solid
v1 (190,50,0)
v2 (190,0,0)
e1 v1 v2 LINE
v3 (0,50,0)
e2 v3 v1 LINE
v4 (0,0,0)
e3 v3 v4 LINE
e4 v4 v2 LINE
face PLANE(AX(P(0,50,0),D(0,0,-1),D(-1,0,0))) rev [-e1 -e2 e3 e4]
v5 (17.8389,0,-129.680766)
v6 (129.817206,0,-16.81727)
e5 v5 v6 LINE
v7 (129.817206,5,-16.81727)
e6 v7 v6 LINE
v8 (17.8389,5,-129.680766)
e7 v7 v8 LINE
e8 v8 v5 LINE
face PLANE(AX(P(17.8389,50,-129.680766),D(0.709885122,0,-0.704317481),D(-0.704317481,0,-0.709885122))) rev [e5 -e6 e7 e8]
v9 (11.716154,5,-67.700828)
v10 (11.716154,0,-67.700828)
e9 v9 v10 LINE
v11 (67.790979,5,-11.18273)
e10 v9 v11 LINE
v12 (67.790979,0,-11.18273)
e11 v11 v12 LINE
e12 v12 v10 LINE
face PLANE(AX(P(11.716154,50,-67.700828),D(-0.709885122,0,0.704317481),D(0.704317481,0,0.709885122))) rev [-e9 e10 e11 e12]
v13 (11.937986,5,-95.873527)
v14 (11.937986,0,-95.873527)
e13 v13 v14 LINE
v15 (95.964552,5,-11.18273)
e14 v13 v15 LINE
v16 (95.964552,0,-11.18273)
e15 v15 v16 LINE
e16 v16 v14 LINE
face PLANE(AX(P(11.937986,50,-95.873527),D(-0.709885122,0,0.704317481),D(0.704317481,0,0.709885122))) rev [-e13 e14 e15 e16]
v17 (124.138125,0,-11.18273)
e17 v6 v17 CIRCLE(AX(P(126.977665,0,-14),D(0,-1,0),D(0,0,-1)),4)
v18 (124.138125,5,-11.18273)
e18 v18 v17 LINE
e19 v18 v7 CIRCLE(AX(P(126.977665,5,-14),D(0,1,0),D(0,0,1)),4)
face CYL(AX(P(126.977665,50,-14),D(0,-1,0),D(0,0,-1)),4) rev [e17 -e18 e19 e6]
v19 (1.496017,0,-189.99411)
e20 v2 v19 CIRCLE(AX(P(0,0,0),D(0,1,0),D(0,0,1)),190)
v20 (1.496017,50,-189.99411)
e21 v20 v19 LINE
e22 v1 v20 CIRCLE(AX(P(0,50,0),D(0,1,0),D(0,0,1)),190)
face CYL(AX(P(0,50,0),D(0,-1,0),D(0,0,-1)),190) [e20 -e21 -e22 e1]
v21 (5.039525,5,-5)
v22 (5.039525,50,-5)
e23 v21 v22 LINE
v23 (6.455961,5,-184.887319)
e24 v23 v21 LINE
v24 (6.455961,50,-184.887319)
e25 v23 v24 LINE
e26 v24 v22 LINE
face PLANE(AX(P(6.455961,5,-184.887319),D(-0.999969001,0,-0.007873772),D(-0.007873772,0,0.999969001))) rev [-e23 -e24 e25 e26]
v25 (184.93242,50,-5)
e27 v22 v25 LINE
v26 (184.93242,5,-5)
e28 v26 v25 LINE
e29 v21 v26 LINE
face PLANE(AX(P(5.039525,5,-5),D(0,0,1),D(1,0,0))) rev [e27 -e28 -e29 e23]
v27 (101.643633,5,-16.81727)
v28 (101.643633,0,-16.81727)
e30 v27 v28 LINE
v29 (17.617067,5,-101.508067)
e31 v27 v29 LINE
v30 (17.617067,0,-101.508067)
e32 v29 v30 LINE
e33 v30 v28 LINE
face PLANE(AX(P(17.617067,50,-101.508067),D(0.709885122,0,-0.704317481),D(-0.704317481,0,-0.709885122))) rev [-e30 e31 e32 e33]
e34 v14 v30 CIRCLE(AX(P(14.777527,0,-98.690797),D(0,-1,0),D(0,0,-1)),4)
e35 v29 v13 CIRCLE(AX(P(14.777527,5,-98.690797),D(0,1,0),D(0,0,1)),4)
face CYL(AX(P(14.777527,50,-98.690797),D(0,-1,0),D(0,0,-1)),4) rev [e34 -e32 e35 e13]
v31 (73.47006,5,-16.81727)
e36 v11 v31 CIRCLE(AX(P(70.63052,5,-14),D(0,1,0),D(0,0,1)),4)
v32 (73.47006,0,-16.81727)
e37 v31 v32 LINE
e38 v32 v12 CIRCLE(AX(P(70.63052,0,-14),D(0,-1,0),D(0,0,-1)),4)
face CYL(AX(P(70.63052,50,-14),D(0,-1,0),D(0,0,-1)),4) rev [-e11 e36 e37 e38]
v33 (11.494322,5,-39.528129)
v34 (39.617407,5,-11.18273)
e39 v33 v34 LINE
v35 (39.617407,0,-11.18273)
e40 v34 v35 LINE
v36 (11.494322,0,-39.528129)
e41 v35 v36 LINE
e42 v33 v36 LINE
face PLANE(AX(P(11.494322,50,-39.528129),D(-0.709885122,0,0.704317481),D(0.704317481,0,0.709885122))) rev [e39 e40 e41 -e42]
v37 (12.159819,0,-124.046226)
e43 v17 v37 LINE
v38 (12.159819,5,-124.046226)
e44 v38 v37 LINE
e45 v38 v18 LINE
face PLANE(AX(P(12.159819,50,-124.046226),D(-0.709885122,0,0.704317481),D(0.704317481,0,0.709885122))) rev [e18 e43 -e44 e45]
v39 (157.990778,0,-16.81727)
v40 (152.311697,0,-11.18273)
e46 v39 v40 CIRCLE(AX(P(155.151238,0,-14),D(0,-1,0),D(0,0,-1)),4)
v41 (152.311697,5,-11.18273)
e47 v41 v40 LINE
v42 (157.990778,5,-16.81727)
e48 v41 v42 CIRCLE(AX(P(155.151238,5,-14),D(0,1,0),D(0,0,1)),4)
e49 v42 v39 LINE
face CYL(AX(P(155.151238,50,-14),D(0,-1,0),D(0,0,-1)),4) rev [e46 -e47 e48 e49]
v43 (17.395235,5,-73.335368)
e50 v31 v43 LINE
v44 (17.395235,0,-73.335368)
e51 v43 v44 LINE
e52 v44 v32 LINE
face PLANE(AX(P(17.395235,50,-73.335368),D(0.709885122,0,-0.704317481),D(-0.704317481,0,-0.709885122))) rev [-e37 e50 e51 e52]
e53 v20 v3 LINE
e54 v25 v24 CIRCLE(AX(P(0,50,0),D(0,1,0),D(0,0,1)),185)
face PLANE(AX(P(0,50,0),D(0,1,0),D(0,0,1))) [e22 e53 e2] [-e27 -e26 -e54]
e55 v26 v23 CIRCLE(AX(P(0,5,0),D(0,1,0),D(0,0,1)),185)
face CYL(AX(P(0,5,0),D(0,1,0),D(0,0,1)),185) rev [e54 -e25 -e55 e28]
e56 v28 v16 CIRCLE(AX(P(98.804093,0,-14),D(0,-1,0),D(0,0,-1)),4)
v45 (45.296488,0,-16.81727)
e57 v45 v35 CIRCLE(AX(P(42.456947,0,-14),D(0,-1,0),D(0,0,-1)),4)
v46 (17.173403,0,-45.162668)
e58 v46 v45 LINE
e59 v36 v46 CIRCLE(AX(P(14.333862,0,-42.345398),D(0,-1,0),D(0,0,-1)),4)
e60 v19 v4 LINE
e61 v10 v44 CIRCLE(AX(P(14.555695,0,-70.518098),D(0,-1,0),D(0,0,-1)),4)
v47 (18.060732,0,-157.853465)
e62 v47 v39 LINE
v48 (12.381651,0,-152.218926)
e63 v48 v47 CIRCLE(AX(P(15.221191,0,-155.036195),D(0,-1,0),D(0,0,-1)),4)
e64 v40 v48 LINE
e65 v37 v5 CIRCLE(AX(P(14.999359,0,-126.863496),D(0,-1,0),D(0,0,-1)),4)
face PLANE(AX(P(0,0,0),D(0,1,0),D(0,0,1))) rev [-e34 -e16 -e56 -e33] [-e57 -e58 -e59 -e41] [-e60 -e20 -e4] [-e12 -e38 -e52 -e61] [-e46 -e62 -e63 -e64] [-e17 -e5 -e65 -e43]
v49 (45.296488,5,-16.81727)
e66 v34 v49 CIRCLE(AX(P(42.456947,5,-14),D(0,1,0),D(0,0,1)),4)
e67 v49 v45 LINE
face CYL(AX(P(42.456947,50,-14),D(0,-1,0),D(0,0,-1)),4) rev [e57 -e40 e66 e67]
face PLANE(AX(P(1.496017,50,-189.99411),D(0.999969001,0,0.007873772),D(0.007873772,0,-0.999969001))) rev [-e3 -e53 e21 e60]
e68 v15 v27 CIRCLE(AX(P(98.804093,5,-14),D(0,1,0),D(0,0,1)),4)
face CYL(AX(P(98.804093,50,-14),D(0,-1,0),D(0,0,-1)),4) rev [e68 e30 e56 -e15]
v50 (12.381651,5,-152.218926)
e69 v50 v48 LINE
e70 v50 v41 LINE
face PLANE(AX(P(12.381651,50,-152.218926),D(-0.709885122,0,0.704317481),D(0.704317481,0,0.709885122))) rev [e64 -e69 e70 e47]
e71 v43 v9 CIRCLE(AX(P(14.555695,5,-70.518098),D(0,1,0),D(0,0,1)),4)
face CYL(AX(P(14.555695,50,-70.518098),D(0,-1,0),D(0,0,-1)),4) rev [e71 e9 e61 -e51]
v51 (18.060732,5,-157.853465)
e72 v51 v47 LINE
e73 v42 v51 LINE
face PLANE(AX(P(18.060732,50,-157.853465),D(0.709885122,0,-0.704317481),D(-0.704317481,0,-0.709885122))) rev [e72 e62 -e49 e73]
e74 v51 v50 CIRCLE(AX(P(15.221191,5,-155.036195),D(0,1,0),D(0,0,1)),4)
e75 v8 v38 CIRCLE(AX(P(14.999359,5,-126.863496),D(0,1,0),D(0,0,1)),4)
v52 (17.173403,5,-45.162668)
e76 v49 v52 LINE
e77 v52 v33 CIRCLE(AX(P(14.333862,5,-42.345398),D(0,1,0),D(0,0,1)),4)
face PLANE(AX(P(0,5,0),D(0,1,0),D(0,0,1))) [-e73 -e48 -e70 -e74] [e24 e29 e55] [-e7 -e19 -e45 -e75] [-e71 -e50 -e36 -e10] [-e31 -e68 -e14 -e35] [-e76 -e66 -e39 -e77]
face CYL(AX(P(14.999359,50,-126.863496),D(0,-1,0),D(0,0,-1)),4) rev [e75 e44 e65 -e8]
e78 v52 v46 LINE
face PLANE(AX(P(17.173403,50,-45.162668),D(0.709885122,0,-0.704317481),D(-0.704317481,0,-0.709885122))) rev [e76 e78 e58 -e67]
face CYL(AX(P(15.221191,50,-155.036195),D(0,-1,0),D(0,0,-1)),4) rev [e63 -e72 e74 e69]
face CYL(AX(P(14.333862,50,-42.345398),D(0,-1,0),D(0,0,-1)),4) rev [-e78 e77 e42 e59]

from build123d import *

# Parameters (mm, degrees)
EXTRUDE_1_DEPTH        = 50
CUT_EXTRUDE_1_DEPTH    = 45
CUT_EXTRUDE_3_DEPTH    = 274.308913017
PATTERN_LINEAR_3_DEPTH = 5


# Read off the part's stored shape, not the designer's step: 阵列(线性)3
with BuildPart() as part:
    # 草图1 → 凸台-拉伸1 (new body)
    with BuildSketch(Plane(origin=(0, 0, 0), x_dir=(1, 0, 0), z_dir=(0, 1, 0))):
        with BuildLine():
            Line((1.496016616, 189.994110262), (0, 0))
            Line((0, 0), (190, 0))
            ThreePointArc((190, 0), (134.878173099, 133.820321407), (1.496016616, 189.994110262))
        make_face()
    extrude(amount=EXTRUDE_1_DEPTH)

    # 草图2 → 切除-拉伸1 (cut)
    with BuildSketch(Plane(origin=(0, 50, 0), x_dir=(1, 0, 0), z_dir=(0, 1, 0))):
        with BuildLine():
            Line((5.039525077, 5), (184.932420089, 5))
            ThreePointArc((184.932420089, 5), (131.328747491, 130.298734001), (6.455960656, 184.887318581))
            Line((6.455960656, 184.887318581), (5.039525077, 5))
        make_face()
    extrude(amount=-CUT_EXTRUDE_1_DEPTH, mode=Mode.SUBTRACT)

    # 草图3 → 切除-拉伸3 (cut, through all)
    with BuildSketch(Plane.XZ):
        with BuildLine():
            Line((11.494321842, -39.528128563), (39.617406911, -11.182730076))
            ThreePointArc((39.617406911, -11.182730076), (45.274217322, -11.160459514), (45.296487884, -16.817269924))
            Line((45.296487884, -16.817269924), (17.173402815, -45.162668411))
            ThreePointArc((17.173402815, -45.162668411), (11.516592404, -45.184938973), (11.494321842, -39.528128563))
        make_face()
    extrude(amount=-CUT_EXTRUDE_3_DEPTH, mode=Mode.SUBTRACT)

    # 阵列(线性)3 outline → 阵列(线性)3 (cut)
    with BuildSketch(Plane(origin=(0, 0, 0), x_dir=(1, 0, 0), z_dir=(0, 1, 0))):
        with BuildLine():
            ThreePointArc((17.395235092, 73.335367655), (11.738424681, 73.357638217), (11.71615412, 67.700827806))
            Line((11.71615412, 67.700827806), (67.790979496, 11.182730076))
            ThreePointArc((67.790979496, 11.182730076), (73.447789906, 11.160459514), (73.470060469, 16.817269924))
            Line((73.470060469, 16.817269924), (17.395235092, 73.335367655))
        make_face()
        with BuildLine():
            ThreePointArc((18.060731925, 157.853465386), (12.403921514, 157.875735948), (12.381650952, 152.218925537))
            Line((12.381650952, 152.218925537), (152.311697253, 11.182730076))
            ThreePointArc((152.311697253, 11.182730076), (157.968507663, 11.160459514), (157.990778225, 16.817269924))
            Line((157.990778225, 16.817269924), (18.060731925, 157.853465386))
        make_face()
        with BuildLine():
            ThreePointArc((17.61706737, 101.508066899), (11.960256959, 101.530337461), (11.937986397, 95.87352705))
            Line((11.937986397, 95.87352705), (95.964552082, 11.182730076))
            ThreePointArc((95.964552082, 11.182730076), (101.621362492, 11.160459514), (101.643633054, 16.817269924))
            Line((101.643633054, 16.817269924), (17.61706737, 101.508066899))
        make_face()
        with BuildLine():
            ThreePointArc((17.838899648, 129.680766142), (12.182089237, 129.703036704), (12.159818675, 124.046226293))
            Line((12.159818675, 124.046226293), (124.138124667, 11.182730076))
            ThreePointArc((124.138124667, 11.182730076), (129.794935077, 11.160459514), (129.81720564, 16.817269924))
            Line((129.81720564, 16.817269924), (17.838899648, 129.680766142))
        make_face()
    extrude(amount=PATTERN_LINEAR_3_DEPTH, mode=Mode.SUBTRACT)


solid = part.part
